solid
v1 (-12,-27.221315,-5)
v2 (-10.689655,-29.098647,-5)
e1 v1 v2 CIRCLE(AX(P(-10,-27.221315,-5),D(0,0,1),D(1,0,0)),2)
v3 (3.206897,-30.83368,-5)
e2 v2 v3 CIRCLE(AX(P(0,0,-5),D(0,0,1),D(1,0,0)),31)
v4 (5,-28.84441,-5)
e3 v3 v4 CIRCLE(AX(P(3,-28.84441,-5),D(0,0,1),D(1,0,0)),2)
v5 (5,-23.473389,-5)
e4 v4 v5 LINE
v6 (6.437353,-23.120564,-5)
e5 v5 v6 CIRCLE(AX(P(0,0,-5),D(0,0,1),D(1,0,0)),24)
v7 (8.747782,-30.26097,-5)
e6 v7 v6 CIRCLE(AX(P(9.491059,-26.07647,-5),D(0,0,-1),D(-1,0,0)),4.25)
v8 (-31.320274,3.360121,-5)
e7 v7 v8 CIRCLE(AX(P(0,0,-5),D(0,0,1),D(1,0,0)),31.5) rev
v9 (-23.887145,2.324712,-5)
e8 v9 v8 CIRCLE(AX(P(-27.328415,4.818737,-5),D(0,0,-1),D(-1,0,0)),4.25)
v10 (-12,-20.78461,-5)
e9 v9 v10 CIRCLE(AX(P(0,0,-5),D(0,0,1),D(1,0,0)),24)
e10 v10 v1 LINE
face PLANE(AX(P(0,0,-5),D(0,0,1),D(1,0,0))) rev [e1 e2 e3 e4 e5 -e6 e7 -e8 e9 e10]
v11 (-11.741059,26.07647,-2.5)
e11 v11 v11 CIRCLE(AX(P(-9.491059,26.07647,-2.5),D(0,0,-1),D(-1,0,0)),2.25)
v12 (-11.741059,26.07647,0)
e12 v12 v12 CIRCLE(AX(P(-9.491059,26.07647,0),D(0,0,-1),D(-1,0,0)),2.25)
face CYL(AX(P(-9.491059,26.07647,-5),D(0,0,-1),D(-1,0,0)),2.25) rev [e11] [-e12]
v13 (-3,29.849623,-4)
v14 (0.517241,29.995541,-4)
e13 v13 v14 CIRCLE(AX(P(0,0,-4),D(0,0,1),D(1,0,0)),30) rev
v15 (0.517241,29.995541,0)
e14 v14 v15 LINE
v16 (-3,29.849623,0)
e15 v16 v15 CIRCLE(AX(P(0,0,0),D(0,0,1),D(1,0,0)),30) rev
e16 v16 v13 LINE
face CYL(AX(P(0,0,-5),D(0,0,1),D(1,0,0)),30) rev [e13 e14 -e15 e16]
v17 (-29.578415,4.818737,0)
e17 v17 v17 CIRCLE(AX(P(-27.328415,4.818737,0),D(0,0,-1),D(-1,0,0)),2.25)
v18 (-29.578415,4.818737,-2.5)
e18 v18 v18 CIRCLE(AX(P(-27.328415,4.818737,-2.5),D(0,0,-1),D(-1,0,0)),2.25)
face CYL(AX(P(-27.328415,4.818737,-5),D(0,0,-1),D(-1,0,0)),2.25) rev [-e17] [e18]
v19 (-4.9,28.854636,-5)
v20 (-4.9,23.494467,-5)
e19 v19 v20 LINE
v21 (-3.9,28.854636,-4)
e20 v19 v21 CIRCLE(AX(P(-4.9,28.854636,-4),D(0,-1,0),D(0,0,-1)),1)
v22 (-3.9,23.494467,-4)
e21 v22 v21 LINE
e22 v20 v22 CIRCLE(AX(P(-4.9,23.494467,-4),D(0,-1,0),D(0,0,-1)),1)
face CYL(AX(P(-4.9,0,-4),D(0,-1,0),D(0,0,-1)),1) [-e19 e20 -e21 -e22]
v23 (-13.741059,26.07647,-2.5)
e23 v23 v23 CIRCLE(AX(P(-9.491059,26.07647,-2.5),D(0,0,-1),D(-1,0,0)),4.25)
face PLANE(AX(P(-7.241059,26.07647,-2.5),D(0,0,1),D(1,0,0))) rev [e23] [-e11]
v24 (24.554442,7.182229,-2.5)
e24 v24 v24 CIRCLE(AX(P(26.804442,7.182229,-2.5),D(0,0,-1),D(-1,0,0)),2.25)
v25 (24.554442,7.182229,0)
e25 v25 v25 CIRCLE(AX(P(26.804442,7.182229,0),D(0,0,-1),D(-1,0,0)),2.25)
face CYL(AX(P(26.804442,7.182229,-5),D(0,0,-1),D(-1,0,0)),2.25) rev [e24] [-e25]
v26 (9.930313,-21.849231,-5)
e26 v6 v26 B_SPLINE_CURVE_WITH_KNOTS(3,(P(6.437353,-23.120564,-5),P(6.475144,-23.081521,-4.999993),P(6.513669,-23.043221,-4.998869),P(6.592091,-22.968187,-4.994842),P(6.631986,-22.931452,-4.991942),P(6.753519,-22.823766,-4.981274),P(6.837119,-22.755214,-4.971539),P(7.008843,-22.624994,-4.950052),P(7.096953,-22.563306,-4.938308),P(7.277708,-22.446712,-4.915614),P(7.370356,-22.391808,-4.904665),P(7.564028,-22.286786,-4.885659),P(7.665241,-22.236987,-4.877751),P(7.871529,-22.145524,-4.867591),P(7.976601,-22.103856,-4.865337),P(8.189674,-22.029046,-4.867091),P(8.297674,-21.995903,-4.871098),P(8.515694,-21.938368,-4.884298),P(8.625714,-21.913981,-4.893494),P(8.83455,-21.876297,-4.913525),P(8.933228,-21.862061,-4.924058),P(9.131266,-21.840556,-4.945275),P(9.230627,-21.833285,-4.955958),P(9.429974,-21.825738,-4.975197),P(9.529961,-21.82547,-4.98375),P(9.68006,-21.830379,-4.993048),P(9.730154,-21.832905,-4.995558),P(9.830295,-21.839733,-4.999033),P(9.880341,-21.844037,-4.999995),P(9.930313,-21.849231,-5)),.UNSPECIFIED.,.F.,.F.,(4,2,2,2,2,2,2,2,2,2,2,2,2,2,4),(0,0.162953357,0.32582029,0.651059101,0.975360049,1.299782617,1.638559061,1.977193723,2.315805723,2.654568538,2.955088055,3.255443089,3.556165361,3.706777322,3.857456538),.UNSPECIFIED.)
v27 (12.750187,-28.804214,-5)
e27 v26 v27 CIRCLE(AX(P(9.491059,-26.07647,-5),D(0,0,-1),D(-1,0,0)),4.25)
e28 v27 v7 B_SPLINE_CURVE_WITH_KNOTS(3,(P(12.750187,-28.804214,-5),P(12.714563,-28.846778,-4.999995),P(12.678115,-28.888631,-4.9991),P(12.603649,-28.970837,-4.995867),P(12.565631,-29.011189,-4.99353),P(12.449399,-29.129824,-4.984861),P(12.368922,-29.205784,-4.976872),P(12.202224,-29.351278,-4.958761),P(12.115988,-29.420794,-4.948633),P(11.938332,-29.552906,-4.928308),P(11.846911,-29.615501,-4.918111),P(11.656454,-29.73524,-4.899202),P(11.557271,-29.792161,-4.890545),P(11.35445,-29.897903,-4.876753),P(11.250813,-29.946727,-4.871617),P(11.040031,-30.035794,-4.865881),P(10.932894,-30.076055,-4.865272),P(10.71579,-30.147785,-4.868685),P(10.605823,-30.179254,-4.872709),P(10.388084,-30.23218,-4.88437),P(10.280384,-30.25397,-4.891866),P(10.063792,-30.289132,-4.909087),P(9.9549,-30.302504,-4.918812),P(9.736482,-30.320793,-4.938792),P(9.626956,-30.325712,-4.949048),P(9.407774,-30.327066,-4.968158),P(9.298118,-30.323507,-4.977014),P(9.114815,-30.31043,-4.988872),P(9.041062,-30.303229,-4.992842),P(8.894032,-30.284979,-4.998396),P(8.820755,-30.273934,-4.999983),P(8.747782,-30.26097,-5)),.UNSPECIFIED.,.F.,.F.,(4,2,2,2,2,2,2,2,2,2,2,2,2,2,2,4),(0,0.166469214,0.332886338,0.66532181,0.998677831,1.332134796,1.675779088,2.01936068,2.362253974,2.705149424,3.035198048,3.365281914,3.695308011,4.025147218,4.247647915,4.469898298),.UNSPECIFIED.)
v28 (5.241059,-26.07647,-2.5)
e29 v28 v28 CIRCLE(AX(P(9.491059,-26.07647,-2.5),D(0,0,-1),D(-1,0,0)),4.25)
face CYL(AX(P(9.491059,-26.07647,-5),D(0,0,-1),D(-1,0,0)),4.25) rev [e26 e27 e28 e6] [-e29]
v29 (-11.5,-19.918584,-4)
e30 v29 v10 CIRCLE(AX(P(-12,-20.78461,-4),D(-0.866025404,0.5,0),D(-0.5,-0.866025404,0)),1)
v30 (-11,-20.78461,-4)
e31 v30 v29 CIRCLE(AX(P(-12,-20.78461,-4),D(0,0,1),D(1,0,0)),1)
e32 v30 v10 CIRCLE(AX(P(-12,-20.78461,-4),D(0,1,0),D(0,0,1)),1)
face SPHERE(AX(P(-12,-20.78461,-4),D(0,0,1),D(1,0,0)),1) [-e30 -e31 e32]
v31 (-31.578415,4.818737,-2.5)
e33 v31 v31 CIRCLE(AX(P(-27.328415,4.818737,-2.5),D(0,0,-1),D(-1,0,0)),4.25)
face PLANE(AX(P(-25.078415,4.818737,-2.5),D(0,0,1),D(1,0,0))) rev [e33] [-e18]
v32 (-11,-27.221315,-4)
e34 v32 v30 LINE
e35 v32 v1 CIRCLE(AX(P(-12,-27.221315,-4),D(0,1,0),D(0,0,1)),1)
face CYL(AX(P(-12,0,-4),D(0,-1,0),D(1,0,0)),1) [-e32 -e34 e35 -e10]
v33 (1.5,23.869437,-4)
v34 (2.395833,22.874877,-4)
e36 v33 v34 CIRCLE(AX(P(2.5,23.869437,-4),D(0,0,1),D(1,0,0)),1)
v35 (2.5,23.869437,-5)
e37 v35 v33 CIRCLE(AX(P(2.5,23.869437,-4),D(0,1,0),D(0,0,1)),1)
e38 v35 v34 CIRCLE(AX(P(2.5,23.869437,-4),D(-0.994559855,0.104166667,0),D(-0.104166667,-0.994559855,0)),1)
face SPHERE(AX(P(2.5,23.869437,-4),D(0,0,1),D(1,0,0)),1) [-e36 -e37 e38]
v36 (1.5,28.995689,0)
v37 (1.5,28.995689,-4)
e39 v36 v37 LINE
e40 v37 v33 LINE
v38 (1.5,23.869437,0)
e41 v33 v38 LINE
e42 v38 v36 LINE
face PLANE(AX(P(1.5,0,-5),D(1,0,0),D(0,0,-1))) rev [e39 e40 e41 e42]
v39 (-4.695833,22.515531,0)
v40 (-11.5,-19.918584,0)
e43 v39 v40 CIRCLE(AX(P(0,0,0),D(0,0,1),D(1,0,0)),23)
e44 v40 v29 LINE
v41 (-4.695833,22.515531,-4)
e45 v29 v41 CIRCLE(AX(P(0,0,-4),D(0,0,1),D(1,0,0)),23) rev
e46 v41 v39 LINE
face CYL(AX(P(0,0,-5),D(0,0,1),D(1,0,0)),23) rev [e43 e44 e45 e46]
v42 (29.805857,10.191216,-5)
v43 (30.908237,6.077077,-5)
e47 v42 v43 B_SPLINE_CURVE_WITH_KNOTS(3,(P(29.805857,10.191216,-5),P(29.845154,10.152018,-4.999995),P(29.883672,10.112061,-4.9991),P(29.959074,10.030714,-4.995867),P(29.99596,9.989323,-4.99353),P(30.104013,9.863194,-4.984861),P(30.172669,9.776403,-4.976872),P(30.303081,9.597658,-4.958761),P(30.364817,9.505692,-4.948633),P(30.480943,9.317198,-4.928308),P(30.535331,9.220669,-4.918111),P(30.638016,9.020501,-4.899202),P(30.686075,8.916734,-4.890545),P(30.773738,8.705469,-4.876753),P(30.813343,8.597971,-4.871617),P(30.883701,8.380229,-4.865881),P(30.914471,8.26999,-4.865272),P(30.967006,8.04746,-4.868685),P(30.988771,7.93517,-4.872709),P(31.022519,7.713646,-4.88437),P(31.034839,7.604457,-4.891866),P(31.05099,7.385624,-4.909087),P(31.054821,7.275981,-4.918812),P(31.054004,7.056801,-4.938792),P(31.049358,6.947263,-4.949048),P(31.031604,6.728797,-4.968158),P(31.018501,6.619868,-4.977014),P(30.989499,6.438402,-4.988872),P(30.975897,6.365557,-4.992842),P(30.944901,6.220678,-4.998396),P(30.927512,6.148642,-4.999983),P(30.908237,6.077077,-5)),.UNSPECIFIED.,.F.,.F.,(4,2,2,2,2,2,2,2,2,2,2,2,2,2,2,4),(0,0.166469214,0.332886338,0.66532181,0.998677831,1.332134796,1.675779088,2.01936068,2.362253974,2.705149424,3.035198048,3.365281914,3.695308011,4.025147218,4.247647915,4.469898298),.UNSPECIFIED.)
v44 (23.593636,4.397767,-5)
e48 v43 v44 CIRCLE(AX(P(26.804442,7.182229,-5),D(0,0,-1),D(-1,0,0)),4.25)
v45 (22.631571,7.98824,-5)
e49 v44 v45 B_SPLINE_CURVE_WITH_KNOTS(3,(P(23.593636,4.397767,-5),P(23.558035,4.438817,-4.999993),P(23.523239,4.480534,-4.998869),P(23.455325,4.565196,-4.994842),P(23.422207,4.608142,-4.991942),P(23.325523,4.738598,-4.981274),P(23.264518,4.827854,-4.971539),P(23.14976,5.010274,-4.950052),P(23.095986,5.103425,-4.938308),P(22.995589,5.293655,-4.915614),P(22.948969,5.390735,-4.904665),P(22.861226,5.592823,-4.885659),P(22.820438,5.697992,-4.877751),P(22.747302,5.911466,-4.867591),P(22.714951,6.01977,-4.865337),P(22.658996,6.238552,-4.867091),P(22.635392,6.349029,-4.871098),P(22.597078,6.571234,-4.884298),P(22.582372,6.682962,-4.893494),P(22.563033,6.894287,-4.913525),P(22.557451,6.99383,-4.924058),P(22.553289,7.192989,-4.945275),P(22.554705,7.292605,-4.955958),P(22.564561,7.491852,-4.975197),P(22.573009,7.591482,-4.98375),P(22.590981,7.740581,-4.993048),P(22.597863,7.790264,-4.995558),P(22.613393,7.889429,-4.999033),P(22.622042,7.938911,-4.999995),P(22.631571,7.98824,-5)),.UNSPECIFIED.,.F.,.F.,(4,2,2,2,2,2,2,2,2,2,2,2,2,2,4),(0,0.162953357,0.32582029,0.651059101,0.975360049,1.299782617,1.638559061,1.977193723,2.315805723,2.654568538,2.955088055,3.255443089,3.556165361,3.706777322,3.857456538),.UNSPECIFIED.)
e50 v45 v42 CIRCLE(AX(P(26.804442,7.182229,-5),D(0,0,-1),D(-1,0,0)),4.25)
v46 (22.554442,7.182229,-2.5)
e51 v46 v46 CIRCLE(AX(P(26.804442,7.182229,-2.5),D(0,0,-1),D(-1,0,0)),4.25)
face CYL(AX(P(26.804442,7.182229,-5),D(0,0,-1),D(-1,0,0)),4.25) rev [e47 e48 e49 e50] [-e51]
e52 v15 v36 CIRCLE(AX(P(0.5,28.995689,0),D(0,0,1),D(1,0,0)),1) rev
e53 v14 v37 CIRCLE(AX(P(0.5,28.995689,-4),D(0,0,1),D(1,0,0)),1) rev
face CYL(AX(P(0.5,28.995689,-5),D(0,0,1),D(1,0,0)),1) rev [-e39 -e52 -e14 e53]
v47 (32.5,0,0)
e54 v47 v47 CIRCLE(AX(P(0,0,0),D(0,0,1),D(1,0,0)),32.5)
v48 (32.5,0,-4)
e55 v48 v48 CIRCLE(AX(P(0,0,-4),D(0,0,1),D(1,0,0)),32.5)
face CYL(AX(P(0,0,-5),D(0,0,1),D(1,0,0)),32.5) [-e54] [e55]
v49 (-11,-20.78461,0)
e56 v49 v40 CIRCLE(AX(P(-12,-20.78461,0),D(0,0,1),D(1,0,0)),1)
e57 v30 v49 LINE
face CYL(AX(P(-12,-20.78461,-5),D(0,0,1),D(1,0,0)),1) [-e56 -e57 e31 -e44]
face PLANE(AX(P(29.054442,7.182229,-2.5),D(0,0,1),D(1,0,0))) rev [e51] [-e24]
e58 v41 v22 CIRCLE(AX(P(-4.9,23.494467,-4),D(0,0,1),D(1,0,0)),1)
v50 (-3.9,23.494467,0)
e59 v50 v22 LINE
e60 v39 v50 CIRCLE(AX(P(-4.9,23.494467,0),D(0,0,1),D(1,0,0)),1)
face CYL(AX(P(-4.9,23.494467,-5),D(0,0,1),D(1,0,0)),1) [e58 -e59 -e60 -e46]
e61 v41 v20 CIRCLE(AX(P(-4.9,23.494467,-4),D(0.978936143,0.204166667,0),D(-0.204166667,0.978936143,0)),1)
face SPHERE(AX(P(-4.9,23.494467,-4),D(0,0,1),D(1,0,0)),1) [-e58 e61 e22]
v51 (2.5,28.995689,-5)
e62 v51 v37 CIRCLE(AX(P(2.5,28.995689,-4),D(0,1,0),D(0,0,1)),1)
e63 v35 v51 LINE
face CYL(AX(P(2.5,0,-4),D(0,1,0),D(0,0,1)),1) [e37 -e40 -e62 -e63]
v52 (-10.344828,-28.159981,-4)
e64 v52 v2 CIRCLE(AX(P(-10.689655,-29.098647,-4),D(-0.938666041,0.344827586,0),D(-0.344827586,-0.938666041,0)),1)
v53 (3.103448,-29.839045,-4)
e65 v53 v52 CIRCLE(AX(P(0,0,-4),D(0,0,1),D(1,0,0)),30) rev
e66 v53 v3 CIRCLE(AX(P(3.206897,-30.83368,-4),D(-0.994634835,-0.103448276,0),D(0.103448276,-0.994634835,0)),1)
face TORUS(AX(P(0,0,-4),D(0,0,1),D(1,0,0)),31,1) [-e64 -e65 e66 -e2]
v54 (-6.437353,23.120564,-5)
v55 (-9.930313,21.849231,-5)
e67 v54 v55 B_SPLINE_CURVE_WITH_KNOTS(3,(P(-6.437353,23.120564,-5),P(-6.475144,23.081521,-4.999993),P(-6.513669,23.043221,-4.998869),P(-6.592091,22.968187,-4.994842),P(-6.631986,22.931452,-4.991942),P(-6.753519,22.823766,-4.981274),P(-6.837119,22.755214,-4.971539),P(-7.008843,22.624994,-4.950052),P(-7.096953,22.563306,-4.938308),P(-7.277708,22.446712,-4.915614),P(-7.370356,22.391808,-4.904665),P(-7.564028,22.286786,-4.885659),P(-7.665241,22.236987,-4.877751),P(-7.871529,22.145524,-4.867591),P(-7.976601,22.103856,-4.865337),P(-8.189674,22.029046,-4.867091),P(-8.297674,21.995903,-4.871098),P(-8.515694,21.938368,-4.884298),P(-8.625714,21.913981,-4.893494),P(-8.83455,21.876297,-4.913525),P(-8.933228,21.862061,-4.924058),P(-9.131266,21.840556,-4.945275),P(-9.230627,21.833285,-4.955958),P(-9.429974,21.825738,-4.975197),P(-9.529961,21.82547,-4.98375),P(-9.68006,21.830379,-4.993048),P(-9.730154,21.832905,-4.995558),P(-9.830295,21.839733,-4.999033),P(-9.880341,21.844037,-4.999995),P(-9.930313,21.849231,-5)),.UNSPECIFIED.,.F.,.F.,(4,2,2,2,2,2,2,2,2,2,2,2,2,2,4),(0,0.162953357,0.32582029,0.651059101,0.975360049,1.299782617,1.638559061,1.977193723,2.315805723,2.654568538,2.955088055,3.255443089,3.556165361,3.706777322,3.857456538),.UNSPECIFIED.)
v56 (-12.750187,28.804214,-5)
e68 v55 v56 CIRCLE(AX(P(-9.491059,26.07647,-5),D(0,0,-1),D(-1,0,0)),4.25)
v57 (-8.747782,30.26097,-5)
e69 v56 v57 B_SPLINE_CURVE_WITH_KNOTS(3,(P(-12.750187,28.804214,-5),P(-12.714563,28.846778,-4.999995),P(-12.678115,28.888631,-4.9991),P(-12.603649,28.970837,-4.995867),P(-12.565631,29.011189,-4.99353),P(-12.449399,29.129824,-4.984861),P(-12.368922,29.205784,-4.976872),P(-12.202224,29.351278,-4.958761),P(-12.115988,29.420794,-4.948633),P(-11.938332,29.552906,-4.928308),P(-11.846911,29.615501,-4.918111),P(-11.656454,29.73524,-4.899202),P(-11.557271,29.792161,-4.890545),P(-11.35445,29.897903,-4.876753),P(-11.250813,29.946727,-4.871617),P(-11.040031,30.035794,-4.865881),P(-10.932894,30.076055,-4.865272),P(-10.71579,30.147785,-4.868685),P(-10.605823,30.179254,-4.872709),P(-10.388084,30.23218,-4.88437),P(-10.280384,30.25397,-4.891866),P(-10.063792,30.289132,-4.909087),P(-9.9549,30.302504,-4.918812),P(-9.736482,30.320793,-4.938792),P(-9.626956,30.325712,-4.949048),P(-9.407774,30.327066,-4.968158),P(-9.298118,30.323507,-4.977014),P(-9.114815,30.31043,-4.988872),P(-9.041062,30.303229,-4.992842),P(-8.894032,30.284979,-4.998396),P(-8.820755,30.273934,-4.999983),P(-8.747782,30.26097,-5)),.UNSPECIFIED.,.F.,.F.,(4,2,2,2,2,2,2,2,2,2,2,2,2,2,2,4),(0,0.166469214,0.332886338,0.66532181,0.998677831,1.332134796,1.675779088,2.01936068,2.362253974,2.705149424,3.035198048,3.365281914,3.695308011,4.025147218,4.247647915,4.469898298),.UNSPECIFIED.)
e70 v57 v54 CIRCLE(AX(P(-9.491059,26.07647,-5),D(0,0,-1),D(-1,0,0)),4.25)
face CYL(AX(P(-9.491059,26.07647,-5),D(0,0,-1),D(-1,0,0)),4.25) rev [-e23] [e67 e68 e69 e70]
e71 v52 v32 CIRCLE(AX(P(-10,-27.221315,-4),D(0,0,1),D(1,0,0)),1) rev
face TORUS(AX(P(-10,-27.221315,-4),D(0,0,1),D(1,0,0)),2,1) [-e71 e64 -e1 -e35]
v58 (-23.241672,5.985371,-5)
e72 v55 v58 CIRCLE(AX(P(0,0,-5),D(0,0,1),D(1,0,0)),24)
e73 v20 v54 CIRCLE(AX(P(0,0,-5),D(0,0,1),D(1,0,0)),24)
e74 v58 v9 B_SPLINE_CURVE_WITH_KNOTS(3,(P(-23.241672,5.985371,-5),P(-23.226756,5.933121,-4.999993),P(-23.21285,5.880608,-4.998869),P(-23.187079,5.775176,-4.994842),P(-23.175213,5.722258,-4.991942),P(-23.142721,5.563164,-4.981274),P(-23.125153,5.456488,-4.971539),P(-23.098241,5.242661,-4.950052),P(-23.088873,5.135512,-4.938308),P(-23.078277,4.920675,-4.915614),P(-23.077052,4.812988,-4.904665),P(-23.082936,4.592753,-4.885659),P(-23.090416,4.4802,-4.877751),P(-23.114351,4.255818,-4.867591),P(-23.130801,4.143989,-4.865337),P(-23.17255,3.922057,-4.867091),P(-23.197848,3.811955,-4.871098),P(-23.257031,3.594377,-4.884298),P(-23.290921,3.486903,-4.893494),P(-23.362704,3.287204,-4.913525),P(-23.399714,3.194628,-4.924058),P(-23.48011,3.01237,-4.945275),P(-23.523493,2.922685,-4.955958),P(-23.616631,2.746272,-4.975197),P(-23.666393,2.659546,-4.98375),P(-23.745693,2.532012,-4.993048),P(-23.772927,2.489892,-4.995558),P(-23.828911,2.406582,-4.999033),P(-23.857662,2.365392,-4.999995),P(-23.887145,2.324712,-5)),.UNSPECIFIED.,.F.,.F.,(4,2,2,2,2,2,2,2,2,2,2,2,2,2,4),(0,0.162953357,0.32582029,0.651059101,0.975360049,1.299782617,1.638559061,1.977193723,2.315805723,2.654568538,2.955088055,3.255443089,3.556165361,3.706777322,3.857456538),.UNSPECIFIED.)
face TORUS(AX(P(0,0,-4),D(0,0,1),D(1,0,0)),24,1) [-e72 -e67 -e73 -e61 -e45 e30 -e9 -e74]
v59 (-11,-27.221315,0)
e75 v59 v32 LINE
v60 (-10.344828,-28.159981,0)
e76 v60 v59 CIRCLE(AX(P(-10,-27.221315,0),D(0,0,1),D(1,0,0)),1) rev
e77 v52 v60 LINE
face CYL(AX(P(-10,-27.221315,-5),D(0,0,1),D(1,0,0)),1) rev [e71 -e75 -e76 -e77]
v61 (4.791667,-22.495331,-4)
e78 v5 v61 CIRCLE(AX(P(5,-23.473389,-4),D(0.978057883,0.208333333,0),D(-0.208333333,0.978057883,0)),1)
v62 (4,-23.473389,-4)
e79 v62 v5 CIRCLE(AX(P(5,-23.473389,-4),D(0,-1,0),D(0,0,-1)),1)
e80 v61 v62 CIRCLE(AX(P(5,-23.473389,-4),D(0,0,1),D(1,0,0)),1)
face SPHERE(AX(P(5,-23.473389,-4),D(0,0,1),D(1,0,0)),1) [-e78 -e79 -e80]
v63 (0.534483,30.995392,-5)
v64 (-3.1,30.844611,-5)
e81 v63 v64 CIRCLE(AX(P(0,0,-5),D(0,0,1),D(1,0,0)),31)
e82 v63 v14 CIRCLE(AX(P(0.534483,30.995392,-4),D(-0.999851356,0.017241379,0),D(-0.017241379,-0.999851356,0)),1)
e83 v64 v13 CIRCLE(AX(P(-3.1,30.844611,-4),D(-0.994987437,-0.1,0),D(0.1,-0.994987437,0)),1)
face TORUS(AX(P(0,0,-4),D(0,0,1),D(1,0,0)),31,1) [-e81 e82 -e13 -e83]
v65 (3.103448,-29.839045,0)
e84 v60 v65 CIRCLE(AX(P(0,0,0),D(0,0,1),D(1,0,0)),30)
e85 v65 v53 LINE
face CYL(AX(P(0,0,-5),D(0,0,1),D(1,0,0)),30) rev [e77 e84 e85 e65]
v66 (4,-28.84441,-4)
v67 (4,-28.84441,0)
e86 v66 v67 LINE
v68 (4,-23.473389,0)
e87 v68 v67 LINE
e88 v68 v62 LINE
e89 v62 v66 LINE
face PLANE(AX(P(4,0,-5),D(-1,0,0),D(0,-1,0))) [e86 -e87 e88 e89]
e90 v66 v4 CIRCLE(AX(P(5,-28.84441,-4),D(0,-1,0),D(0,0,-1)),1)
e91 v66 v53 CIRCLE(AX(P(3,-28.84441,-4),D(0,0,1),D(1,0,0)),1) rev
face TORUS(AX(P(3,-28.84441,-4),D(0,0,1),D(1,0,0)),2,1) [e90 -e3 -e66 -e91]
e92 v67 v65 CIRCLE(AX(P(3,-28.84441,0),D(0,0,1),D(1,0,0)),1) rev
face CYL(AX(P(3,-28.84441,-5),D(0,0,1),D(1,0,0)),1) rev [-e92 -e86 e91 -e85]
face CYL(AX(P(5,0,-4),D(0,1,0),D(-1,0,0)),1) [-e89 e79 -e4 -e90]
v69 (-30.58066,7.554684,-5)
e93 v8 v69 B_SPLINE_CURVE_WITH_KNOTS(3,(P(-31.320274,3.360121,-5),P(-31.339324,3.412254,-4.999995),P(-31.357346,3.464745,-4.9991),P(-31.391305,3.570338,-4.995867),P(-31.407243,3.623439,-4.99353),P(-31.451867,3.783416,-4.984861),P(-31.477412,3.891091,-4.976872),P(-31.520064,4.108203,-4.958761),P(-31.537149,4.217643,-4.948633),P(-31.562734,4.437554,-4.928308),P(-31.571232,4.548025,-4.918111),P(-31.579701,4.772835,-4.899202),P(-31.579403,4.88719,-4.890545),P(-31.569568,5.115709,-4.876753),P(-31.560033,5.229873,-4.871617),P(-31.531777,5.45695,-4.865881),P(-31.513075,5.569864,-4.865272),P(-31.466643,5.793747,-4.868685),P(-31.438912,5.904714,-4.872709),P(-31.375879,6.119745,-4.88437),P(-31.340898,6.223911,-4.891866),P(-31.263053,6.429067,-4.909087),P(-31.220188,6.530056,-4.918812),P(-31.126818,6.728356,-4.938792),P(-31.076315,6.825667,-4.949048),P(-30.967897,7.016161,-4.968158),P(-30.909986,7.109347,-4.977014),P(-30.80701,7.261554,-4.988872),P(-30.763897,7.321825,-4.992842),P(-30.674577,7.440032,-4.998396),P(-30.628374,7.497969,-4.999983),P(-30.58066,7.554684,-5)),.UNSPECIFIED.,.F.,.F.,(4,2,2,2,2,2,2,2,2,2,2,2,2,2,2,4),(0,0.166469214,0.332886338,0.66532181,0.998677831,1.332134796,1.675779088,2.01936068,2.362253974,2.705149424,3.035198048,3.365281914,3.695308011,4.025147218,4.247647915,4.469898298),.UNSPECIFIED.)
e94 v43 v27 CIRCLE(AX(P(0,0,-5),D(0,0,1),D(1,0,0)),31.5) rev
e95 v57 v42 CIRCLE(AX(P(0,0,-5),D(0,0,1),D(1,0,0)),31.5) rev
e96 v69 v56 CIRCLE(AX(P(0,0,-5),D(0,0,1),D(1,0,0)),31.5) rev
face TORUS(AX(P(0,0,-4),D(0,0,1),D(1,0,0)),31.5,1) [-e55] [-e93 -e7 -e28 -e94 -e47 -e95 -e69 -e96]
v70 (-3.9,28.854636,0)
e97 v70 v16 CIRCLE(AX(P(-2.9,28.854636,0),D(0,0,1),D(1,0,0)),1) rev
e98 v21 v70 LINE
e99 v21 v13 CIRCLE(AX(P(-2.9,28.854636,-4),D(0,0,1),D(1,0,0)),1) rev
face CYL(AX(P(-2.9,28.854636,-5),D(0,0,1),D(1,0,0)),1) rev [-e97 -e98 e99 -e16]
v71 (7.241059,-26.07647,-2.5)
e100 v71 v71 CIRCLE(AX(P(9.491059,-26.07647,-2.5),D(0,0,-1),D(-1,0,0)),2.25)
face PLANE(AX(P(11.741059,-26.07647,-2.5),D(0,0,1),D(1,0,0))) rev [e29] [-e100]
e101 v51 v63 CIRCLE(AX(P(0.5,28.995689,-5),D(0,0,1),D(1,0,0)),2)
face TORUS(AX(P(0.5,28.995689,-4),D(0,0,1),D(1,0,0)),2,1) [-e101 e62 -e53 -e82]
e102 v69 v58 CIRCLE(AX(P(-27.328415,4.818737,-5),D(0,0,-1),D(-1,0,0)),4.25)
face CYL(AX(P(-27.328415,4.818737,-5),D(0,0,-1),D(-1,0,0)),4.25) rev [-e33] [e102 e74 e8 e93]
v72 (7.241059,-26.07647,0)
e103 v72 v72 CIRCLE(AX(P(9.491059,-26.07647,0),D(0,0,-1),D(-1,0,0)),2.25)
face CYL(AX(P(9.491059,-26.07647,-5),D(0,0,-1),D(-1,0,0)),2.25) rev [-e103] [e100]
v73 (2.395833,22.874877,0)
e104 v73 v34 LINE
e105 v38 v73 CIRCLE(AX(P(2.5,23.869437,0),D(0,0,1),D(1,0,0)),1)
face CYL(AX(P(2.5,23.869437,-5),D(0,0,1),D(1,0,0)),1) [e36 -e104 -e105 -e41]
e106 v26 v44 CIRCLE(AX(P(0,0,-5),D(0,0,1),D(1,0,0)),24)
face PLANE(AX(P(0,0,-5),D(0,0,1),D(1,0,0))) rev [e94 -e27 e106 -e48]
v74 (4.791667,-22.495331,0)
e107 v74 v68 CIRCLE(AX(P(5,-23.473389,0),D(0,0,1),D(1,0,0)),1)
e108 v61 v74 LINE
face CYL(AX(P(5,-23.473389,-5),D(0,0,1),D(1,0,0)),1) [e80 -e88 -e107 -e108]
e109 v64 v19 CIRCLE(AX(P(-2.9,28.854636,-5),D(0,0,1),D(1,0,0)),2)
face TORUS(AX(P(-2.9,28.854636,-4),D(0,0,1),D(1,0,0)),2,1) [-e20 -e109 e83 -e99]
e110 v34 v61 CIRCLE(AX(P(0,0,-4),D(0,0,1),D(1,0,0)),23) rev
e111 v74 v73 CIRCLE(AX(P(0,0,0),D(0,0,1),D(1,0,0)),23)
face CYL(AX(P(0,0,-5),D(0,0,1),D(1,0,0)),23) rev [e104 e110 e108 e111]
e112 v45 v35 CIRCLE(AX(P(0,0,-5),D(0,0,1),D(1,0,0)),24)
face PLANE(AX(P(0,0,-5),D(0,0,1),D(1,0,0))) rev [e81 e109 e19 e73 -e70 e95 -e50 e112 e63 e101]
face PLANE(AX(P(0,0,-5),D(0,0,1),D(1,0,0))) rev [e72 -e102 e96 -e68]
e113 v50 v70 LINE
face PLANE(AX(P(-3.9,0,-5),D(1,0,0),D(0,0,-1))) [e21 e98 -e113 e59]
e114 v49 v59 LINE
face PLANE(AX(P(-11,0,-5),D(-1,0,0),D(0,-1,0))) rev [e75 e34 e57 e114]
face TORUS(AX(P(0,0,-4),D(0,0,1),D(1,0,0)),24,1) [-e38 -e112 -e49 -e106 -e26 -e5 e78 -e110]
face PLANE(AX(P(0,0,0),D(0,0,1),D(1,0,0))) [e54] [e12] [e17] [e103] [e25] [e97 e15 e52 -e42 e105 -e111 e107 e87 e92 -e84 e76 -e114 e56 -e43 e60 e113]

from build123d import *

# Parameters (mm, degrees)
SKETCH1_R                      = 32.5
BOSS_EXTRUDE1_DEPTH            = 5
CBORE_FOR_M4_SHCS1_D           = 4.5
CBORE_FOR_M4_SHCS1_CBORE_D     = 8.5
CBORE_FOR_M4_SHCS1_CBORE_DEPTH = 2.5
FILLET2_R                      = 1
FILLET3_R                      = 1


with BuildPart() as part:
    # Sketch1 → Boss-Extrude1 (new body)
    # profile 1 of 3: a face of its own
    with BuildSketch(Plane.XY):
        Circle(SKETCH1_R)
        with BuildLine():
            ThreePointArc((23, -5.63e-15), (17.621010186706098, -14.78174549909448), (3.9999999999999916, -22.64950330581225))
            Line((4, -22.64950330581225), (4.000000000000002, -29.732137494637012))
            ThreePointArc((4.0000000000000036, -29.73213749463701), (-3.6165626901756736, -29.781210088040908), (-11, -27.910571473905726))
            ThreePointArc((-11, -27.910571473905726), (-23.481565178581636, -18.6712639305437), (-29.671263930543617, -4.429006295324187))
            Line((-29.671263930543613, -4.429006295324186), (-22.9928556845359, -0.5732254967333699))
            ThreePointArc((-22.992855684535897, -0.5732254967333679), (-17.771682573326455, 14.600249946933266), (-3.899999999999999, 22.6669362729064))
            Line((-3.9, 22.6669362729064), (-3.9, 29.74541981549428))
            ThreePointArc((-3.8999999999999995, 29.74541981549428), (-1.204897673941924, 29.975793927689868), (1.4999999999999982, 29.96247653315726))
            ThreePointArc((1.4999999999999982, 29.96247653315726), (16.28027637225523, 25.19826583800932), (26.69826583800923, 13.682200160902106))
            Line((26.69826583800923, 13.682200160902106), (20.626179210300915, 10.176479311851942))
            ThreePointArc((20.626179210300908, 10.17647931185194), (22.398684356864813, 5.2248386655991155), (23, 0))
        make_face(mode=Mode.SUBTRACT)
    # profile 2 of 3: a face of its own
    with BuildSketch(Plane.XY):
        with BuildLine():
            ThreePointArc((1.4999999999999991, 22.951034835057), (12.774555523205114, 19.126179210300986), (20.626179210300908, 10.17647931185194))
            Line((20.626179210300915, 10.176479311851942), (26.69826583800923, 13.682200160902106))
            ThreePointArc((26.69826583800923, 13.682200160902106), (16.28027637225523, 25.19826583800932), (1.4999999999999982, 29.96247653315726))
            Line((1.5, 29.962476533157268), (1.5, 22.951034835057))
        make_face()
    # profile 3 of 3: a face of its own
    with BuildSketch(Plane.XY):
        with BuildLine():
            Line((-10.999999999999998, -27.910571473905723), (-11, -20.199009876724155))
            ThreePointArc((-11.000000000000004, -20.19900987672415), (-19.62578437999088, -11.992855684535943), (-22.992855684535897, -0.5732254967333679))
            Line((-22.9928556845359, -0.5732254967333699), (-29.671263930543613, -4.429006295324186))
            ThreePointArc((-29.671263930543617, -4.429006295324187), (-23.481565178581636, -18.6712639305437), (-11, -27.910571473905726))
        make_face()
    extrude(amount=-BOSS_EXTRUDE1_DEPTH)

    # CBORE for M4 SHCS1 (through all)
    with Locations(Plane(origin=(0, 0, -5), x_dir=(-1, 0, 0), z_dir=(0, 0, -1))):
        with Locations((27.328415146, 4.81873693), (9.491058977, 26.076470227), (-26.80444168, 7.182228502), (-9.491058977, -26.076470227)):
            CounterBoreHole(CBORE_FOR_M4_SHCS1_D / 2, CBORE_FOR_M4_SHCS1_CBORE_D / 2, CBORE_FOR_M4_SHCS1_CBORE_DEPTH)

    # Fillet2
    fillet2_edges = [part.edges().sort_by_distance(p)[0] for p in [
        (4.0000000000000036, -29.732137494637012, -2.5),
        (3.9999999999999947, -22.649503305812253, -2.5),
        (1.4999999999999996, 22.951034835057, -2.5),
        (1.4999999999999982, 29.96247653315727, -2.5),
        (-3.8999999999999995, 29.74541981549428, -2.5),
        (-3.9000000000000004, 22.666936272906405, -2.5),
        (-11.000000000000002, -20.199009876724155, -2.5),
        (-11, -27.910571473905723, -2.5),
    ]]
    fillet(fillet2_edges, radius=FILLET2_R)

    # Fillet3
    # the kernel refuses this fillet: 1 mm, written as the material it takes off along each edge
    with BuildSketch(Plane(origin=(0, 0, -5), x_dir=(1, 0, 0), z_dir=(0, -1, 0))) as fillet3_piece_1:
        with BuildLine():
            CenterArc((32.5 - FILLET3_R, FILLET3_R), FILLET3_R, 270, 90)
            Line((32.5 - FILLET3_R, 0), (32.5, 0))
            Line((32.5, 0), (32.5, FILLET3_R))
        make_face()
    revolve(axis=Axis((0, 0, -5), (0, 0, 1)), mode=Mode.SUBTRACT)
    with BuildSketch(Plane(origin=(-10.999999999999998, -27.22131517763241, -5), x_dir=(0, 0, 1), z_dir=(-2.3e-16, 1, 0))) as fillet3_piece_2:
        with BuildLine():
            CenterArc((FILLET3_R, -FILLET3_R), FILLET3_R, 90, 90)
            Line((0, -FILLET3_R), (0, 0))
            Line((0, 0), (FILLET3_R, 0))
        make_face()
    extrude(amount=6.436705486805881, mode=Mode.SUBTRACT)
    with BuildSketch(Plane(origin=(0, 8.9e-16, -5), x_dir=(-0.20416666666666677, 0.9789361430768722, 0), z_dir=(0.9789361430768722, 0.20416666666666677, 0))) as fillet3_piece_3:
        with BuildLine():
            CenterArc((23.000000000000007 + FILLET3_R, FILLET3_R), FILLET3_R, 180, 90.00000000000023)
            Line((23.000000000000007 + FILLET3_R, 0), (23.000000000000007, 0))
            Line((23.000000000000007, 0), (23.000000000000004, FILLET3_R))
        make_face()
    revolve(axis=Axis((0, 8.9e-16, -5), (0, 0, 1)), revolution_arc=138.21927913591307, mode=Mode.SUBTRACT)
    with BuildSketch(Plane(origin=(-3.354e-14, -2.2382e-13, -5), x_dir=(0.10344827586207093, -0.9946348346107555, 0), z_dir=(0.9946348346107555, 0.10344827586207093, 0))) as fillet3_piece_4:
        with BuildLine():
            CenterArc((29.999999999999787 + FILLET3_R, -FILLET3_R), FILLET3_R, 90, 90)
            Line((29.999999999999787 + FILLET3_R, 0), (29.999999999999787, 0))
            Line((29.999999999999787, 0), (29.999999999999787, -FILLET3_R))
        make_face()
    revolve(axis=Axis((-3.354e-14, -2.2382e-13, -5), (0, 0, -1)), revolution_arc=26.1090437980706, mode=Mode.SUBTRACT)
    with BuildSketch(Plane(origin=(4, -23.47338918861092, -5), x_dir=(0, 0, 1), z_dir=(2.5e-16, -1, 0))) as fillet3_piece_5:
        with BuildLine():
            CenterArc((FILLET3_R, -FILLET3_R), FILLET3_R, 90, 90)
            Line((0, -FILLET3_R), (0, 0))
            Line((0, 0), (FILLET3_R, 0))
        make_face()
    extrude(amount=5.371021015100997, mode=Mode.SUBTRACT)
    with BuildSketch(Plane(origin=(8.527e-14, 1.554e-14, -5), x_dir=(0.2083333333333306, -0.9780578828587924, 0), z_dir=(-0.9780578828587924, -0.2083333333333306, 0))) as fillet3_piece_6:
        with BuildLine():
            CenterArc((22.99999999999991 + FILLET3_R, FILLET3_R), FILLET3_R, 180, 89.99999999999977)
            Line((22.99999999999991 + FILLET3_R, 0), (22.99999999999991, 0))
            Line((22.99999999999991, 0), (22.999999999999915, FILLET3_R))
        make_face()
    revolve(axis=Axis((8.527e-14, 1.554e-14, -5), (0, 0, 1)), revolution_arc=161.9961440231332, mode=Mode.SUBTRACT)
    with BuildSketch(Plane(origin=(1.5, 28.995689334795948, -5), x_dir=(0, 0, 1), z_dir=(0, -1, 0))) as fillet3_piece_7:
        with BuildLine():
            CenterArc((FILLET3_R, -FILLET3_R), FILLET3_R, 90, 90)
            Line((0, -FILLET3_R), (0, 0))
            Line((0, 0), (FILLET3_R, 0))
        make_face()
    extrude(amount=5.126252810235989, mode=Mode.SUBTRACT)
    with BuildSketch(Plane(origin=(4.546e-14, -1.62004e-12, -5), x_dir=(-0.09999999999999602, 0.9949874371066204, 0), z_dir=(-0.9949874371066204, -0.09999999999999602, 0))) as fillet3_piece_8:
        with BuildLine():
            CenterArc((30.000000000001613 + FILLET3_R, -FILLET3_R), FILLET3_R, 90, 90)
            Line((30.000000000001613 + FILLET3_R, 0), (30.000000000001613, 0))
            Line((30.000000000001613, 0), (30.000000000001613, -FILLET3_R))
        make_face()
    revolve(axis=Axis((4.546e-14, -1.62004e-12, -5), (0, 0, -1)), revolution_arc=6.727077693922609, mode=Mode.SUBTRACT)
    with BuildSketch(Plane(origin=(-3.9, 23.494467433844935, -5), x_dir=(-4.4e-16, 0, 1), z_dir=(0, 1, 0))) as fillet3_piece_9:
        with BuildLine():
            CenterArc((FILLET3_R, -FILLET3_R), FILLET3_R, 90.00000000000003, 89.99999999999994)
            Line((4.4e-16, -FILLET3_R), (0, 0))
            Line((0, 0), (FILLET3_R, 0))
        make_face()
    extrude(amount=5.360168242247035, mode=Mode.SUBTRACT)
    with BuildSketch(Plane(origin=(-4.9, 23.49446743384493, -5), x_dir=(0.2041666666666649, -0.9789361430768725, 0), z_dir=(-0.9789361430768725, -0.2041666666666649, 0))) as fillet3_piece_10:
        with BuildLine():
            CenterArc((0.9999999999999997 - FILLET3_R, FILLET3_R), FILLET3_R, 270, 90)
            Line((0.9999999999999997 - FILLET3_R, 0), (0.9999999999999997, 0))
            Line((0.9999999999999997, 0), (0.9999999999999999, FILLET3_R))
        make_face()
    revolve(axis=Axis((-4.9, 23.49446743384493, -5), (0, 0, 1)), revolution_arc=78.2192791359134, mode=Mode.SUBTRACT)
    with BuildSketch(Plane(origin=(2.5, 23.86943652455996, -5), x_dir=(-0.10416666666666341, -0.9945598551900012, 0), z_dir=(0.9945598551900012, -0.10416666666666341, 0))) as fillet3_piece_11:
        with BuildLine():
            CenterArc((1 - FILLET3_R, -FILLET3_R), FILLET3_R, 0, 90)
            Line((1 - FILLET3_R, 0), (1, 0))
            Line((1, 0), (1, -FILLET3_R))
        make_face()
    revolve(axis=Axis((2.5, 23.86943652455996, -5), (0, 0, -1)), revolution_arc=84.02084320369887, mode=Mode.SUBTRACT)
    with BuildSketch(Plane(origin=(5.000000000000001, -23.47338918861092, -5), x_dir=(-1, 0, 0), z_dir=(0, -1, 0))) as fillet3_piece_12:
        with BuildLine():
            CenterArc((1 - FILLET3_R, -FILLET3_R), FILLET3_R, 0, 90)
            Line((1 - FILLET3_R, 0), (1, 0))
            Line((1, 0), (1, -FILLET3_R))
        make_face()
    revolve(axis=Axis((5.000000000000001, -23.47338918861092, -5), (0, 0, -1)), revolution_arc=77.97530081943442, mode=Mode.SUBTRACT)
    with BuildSketch(Plane(origin=(-12, -20.784609690826528, -5), x_dir=(1, 0, 0), z_dir=(0, -1, 0))) as fillet3_piece_13:
        with BuildLine():
            CenterArc((1 - FILLET3_R, FILLET3_R), FILLET3_R, 270, 90)
            Line((1 - FILLET3_R, 0), (1, 0))
            Line((1, 0), (1, FILLET3_R))
        make_face()
    revolve(axis=Axis((-12, -20.784609690826528, -5), (0, 0, 1)), revolution_arc=59.99999999999988, mode=Mode.SUBTRACT)
    with BuildSketch(Plane(origin=(-9.999999999999998, -27.221315177632405, -5), x_dir=(-0.34482758620689447, -0.9386660406080146, 0), z_dir=(0.9386660406080146, -0.34482758620689447, 0))) as fillet3_piece_14:
        with BuildLine():
            CenterArc((1.0000000000000018 + FILLET3_R, -FILLET3_R), FILLET3_R, 90, 90)
            Line((1.0000000000000018 + FILLET3_R, 0), (1.0000000000000018, 0))
            Line((1.0000000000000018, 0), (1.0000000000000018, -FILLET3_R))
        make_face()
    revolve(axis=Axis((-9.999999999999998, -27.221315177632405, -5), (0, 0, -1)), revolution_arc=69.82872865353495, mode=Mode.SUBTRACT)
    with BuildSketch(Plane(origin=(3.0000000000000013, -28.844410203711917, -5), x_dir=(1, 0, 0), z_dir=(0, 1, 0))) as fillet3_piece_15:
        with BuildLine():
            CenterArc((1.0000000000000004 + FILLET3_R, -FILLET3_R), FILLET3_R, 90, 90)
            Line((1.0000000000000004 + FILLET3_R, 0), (1.0000000000000004, 0))
            Line((1.0000000000000004, 0), (1.0000000000000004, -FILLET3_R))
        make_face()
    revolve(axis=Axis((3.0000000000000013, -28.844410203711917, -5), (0, 0, -1)), revolution_arc=84.06222754839449, mode=Mode.SUBTRACT)
    with BuildSketch(Plane(origin=(0.5, 28.995689334795948, -5), x_dir=(1, 0, 0), z_dir=(0, -1, 0))) as fillet3_piece_16:
        with BuildLine():
            CenterArc((1 + FILLET3_R, FILLET3_R), FILLET3_R, 180, 90)
            Line((1 + FILLET3_R, 0), (1, 0))
            Line((1, 0), (1, FILLET3_R))
        make_face()
    revolve(axis=Axis((0.5, 28.995689334795948, -5), (0, 0, 1)), revolution_arc=89.01209278334395, mode=Mode.SUBTRACT)
    with BuildSketch(Plane(origin=(-2.9, 28.85463567609197, -5), x_dir=(-0.09999999999999662, 0.9949874371066203, 0), z_dir=(0.9949874371066203, 0.09999999999999662, 0))) as fillet3_piece_17:
        with BuildLine():
            CenterArc((0.9999999999999991 + FILLET3_R, FILLET3_R), FILLET3_R, 180, 90)
            Line((0.9999999999999991 + FILLET3_R, 0), (0.9999999999999991, 0))
            Line((0.9999999999999991, 0), (0.9999999999999991, FILLET3_R))
        make_face()
    revolve(axis=Axis((-2.9, 28.85463567609197, -5), (0, 0, 1)), revolution_arc=84.26082952273342, mode=Mode.SUBTRACT)


solid = part.part
